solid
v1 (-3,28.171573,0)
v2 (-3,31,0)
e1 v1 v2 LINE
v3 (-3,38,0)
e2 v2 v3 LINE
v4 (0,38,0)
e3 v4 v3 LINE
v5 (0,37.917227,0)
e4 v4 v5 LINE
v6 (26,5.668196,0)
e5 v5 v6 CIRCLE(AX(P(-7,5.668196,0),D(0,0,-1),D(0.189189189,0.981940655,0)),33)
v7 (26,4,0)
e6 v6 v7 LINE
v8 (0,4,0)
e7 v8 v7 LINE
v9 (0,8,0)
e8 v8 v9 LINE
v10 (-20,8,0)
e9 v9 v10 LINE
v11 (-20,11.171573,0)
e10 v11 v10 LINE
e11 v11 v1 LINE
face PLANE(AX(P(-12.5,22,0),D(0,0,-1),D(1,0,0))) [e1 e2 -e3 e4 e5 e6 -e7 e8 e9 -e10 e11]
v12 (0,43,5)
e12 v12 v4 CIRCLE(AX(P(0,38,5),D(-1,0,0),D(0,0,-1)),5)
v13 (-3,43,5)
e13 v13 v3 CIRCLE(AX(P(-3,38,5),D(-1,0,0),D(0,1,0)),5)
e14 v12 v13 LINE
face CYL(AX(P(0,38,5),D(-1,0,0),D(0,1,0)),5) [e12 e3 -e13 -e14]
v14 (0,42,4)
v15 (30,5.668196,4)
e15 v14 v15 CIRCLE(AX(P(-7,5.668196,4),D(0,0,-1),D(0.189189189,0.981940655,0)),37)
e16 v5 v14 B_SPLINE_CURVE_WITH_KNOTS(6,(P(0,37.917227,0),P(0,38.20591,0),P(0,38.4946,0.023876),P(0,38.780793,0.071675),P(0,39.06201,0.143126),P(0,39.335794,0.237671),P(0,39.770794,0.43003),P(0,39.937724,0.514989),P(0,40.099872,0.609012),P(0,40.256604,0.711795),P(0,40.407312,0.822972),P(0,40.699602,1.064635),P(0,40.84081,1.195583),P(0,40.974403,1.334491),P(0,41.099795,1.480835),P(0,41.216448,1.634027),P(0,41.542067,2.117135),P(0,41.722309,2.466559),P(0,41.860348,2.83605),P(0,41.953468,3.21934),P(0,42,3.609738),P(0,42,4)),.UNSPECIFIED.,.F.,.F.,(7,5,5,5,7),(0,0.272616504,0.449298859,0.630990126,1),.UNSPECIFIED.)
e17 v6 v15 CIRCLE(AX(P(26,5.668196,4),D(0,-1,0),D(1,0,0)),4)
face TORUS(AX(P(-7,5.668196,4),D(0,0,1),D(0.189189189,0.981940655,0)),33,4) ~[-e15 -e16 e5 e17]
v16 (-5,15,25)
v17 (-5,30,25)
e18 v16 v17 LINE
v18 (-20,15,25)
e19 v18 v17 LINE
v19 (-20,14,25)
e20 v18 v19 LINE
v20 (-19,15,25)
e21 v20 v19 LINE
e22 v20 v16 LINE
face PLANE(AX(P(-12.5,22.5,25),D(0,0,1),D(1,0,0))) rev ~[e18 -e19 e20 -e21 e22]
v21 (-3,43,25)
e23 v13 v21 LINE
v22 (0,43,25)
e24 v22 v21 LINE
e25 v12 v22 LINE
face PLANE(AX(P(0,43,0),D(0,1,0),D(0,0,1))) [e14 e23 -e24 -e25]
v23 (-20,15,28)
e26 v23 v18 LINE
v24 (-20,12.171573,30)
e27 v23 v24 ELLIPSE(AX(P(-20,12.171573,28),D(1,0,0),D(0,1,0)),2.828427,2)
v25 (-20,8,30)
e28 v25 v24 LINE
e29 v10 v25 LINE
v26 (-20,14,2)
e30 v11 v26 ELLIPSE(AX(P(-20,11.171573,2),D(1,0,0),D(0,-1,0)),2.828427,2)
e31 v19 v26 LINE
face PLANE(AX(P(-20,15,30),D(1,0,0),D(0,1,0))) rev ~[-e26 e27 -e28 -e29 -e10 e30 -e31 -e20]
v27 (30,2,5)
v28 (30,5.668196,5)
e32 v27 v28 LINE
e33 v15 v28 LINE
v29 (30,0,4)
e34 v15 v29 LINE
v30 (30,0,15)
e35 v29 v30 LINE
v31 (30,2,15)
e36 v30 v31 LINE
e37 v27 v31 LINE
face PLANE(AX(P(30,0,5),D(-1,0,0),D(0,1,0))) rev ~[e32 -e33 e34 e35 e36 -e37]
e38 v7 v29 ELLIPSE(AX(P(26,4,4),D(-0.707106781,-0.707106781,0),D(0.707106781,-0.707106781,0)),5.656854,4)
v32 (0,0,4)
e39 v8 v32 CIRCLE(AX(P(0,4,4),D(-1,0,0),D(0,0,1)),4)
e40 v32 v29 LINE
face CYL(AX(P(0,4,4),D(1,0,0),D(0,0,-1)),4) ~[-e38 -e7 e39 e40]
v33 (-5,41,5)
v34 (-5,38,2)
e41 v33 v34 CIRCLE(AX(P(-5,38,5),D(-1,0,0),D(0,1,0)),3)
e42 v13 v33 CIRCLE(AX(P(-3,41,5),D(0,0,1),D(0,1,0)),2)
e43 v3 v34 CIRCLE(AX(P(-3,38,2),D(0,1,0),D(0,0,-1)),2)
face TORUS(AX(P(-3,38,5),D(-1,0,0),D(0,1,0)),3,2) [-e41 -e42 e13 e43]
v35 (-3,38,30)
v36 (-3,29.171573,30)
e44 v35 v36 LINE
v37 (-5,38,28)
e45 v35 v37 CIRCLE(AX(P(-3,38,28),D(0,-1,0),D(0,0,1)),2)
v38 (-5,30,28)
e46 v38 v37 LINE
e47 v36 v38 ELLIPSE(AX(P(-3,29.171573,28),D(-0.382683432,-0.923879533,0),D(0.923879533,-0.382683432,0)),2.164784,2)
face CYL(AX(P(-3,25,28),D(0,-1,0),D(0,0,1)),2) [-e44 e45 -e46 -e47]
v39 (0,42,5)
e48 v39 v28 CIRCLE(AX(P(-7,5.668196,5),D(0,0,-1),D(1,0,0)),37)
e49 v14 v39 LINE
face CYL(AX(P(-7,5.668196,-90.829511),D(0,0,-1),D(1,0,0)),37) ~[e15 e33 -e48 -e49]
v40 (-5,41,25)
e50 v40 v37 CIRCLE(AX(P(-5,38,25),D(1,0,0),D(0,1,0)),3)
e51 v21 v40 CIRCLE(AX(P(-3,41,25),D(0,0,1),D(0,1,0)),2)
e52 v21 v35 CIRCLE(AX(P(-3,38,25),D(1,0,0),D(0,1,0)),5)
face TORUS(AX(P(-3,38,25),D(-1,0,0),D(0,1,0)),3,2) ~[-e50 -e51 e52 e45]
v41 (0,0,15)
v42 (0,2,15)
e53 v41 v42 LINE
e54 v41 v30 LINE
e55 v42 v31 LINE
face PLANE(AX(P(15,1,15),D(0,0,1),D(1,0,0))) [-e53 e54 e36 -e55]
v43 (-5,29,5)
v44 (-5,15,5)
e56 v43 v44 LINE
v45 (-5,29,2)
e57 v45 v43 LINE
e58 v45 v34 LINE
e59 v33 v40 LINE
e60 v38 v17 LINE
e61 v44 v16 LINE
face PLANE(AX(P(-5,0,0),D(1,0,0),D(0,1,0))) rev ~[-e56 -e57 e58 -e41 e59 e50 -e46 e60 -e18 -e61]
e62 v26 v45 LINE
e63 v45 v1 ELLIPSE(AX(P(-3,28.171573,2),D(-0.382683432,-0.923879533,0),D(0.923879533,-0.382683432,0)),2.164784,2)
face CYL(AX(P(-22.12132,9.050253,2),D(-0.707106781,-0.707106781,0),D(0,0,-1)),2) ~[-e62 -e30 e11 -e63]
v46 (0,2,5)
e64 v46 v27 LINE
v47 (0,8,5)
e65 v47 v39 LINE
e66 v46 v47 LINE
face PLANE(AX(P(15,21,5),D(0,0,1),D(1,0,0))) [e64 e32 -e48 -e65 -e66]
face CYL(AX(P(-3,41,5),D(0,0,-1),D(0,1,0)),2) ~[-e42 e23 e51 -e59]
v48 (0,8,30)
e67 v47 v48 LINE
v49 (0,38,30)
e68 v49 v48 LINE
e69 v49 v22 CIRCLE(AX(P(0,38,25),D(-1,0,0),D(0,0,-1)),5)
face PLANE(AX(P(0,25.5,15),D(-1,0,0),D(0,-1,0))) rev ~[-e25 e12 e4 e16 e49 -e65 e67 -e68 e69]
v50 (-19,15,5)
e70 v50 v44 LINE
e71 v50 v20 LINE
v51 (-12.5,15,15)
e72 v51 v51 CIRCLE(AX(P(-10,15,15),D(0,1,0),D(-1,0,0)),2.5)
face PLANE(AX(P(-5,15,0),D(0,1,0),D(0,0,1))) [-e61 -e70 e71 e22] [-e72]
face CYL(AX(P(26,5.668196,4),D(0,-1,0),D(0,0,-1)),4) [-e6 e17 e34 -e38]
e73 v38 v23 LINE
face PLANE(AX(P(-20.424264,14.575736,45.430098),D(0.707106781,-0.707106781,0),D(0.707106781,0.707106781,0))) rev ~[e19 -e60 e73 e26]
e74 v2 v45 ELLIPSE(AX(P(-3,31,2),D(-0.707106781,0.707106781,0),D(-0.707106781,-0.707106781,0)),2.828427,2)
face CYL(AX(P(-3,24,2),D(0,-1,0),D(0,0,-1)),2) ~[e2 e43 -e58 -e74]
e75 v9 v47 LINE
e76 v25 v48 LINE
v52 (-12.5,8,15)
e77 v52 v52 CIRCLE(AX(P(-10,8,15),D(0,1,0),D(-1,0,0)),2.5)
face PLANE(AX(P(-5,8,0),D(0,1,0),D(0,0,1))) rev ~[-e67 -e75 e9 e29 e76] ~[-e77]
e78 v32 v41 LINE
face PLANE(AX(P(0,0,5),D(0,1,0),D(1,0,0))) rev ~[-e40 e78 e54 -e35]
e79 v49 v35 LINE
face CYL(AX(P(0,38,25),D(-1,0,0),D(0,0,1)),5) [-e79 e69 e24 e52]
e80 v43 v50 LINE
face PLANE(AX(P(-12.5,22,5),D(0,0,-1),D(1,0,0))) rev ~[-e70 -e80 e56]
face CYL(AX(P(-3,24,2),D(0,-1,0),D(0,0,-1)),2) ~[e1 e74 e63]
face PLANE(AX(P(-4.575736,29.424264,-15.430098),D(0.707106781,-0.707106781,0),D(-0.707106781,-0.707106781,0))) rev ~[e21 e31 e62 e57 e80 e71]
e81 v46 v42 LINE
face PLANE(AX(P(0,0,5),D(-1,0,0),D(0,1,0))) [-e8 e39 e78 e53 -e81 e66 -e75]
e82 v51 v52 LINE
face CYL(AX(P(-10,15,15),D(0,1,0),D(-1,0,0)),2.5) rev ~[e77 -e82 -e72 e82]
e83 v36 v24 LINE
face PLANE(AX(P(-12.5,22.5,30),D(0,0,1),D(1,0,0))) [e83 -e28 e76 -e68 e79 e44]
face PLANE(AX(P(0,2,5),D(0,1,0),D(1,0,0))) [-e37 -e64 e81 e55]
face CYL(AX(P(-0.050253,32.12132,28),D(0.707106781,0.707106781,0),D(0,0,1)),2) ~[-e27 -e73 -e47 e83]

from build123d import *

# Parameters (mm, degrees)
F0_W          = 30
F0_H          = 42
F1_DEPTH      = 5
F2_T1_DEPTH   = 186.6590212458
F3_W          = 30
F3_H          = 2
F4_DEPTH      = 10
F5_W          = 35
F5_H          = 30
F6_DEPTH      = 5
F7_W          = 7
F7_H          = 30
F8_DEPTH      = 15
F9_R          = 2.5
F10_DEPTH     = 10
F11_R         = 4
F12_W         = 15
F12_H         = 14
F13_DEPTH     = 5
F14_W         = 15
F14_H         = 15
F15_DEPTH     = 5
F16_T4_DEPTH  = 35.8601958556
F16_T9_DEPTH  = 35.8601958556
F17_R         = 5
F18_T1_DEPTH  = 20
F18_T6_DEPTH  = 9.5699020722
F18_T11_DEPTH = 31.2132034356
F18_T16_DEPTH = 31.2132034356
F18_T21_DEPTH = 14
F18_T24_ANGLE = 90
F18_T26_ANGLE = 90
F18_T30_DEPTH = 13
F18_T36_DEPTH = 14
F18_T40_DEPTH = 31.2132034356
F18_T47_DEPTH = 13
F18_T51_DEPTH = 31.2132034356


# Not quite as in the source:
# - a fillet or chamfer that OpenCascade refuses, or shapes differently, is made with other operations: its cross-section is extruded or revolved along the edge and cut away or added


with BuildPart() as f1:
    # F0 (on Top) → F1 (new body)
    with BuildSketch(Plane.XY):
        with Locations((15, 21)):
            Rectangle(F0_W, F0_H)
    extrude(amount=F1_DEPTH)

    # F2: fillet of radius 37 on 1 edges, made by hand

    # F2_s2 → F2_t1 (cut)
    with BuildSketch(Plane.XY.offset(-90.8295106229)):
        with BuildLine():
            ThreePointArc((30, 5.6681957508), (21.5306852354, 29.2266337296), (0, 42))
            Line((0, 42), (30, 42))
            Line((30, 42), (30, 5.6681957508))
        make_face()
    extrude(amount=F2_T1_DEPTH, mode=Mode.SUBTRACT)

    # F3 (on face) → F4 (join)
    with BuildSketch(Plane.XY.offset(5)):
        with Locations((15, 1)):
            Rectangle(F3_W, F3_H)
    extrude(amount=F4_DEPTH)

    # F5 (on face) → F6 (join)
    with BuildSketch(Plane(origin=(0, 0, 0), x_dir=(0, -1, 0), z_dir=(-1, 0, 0))):
        with Locations((-25.5, 15)):
            Rectangle(F5_W, F5_H)
    extrude(amount=F6_DEPTH)

    # F7 (on face) → F8 (join)
    with BuildSketch(Plane(origin=(-5, 0, 0), x_dir=(0, -1, 0), z_dir=(-1, 0, 0))):
        with Locations((-11.5, 15)):
            Rectangle(F7_W, F7_H)
    extrude(amount=F8_DEPTH)

    # F9 (on face) → F10 (cut)
    with BuildSketch(Plane(origin=(0, 15, 0), x_dir=(-1, 0, 0), z_dir=(0, 1, 0))):
        with Locations((10, 15)):
            Circle(F9_R)
    extrude(amount=-F10_DEPTH, mode=Mode.SUBTRACT)

    # F11
    f11_edges = [f1.edges().sort_by_distance(p)[0] for p in [
        (21.530685, 29.226634, 0),
        (15, 0, 0),
    ]]
    fillet(f11_edges, radius=F11_R)

    # F12 (on face) → F13 (join)
    with BuildSketch(Plane(origin=(0, 0, 0), x_dir=(1, 0, 0), z_dir=(0, 0, -1))):
        with Locations((-12.5, -22)):
            Rectangle(F12_W, F12_H)
    extrude(amount=-F13_DEPTH)

    # F14 (on face) → F15 (join)
    with BuildSketch(Plane.XY.offset(30)):
        with Locations((-12.5, 22.5)):
            Rectangle(F14_W, F14_H)
    extrude(amount=-F15_DEPTH)

    # F16: chamfer of 15 on 2 edges, made by hand


with BuildPart() as f16_tool2:
    # F16_s3 → F16_t4 (new body)
    with BuildSketch(Plane.XY.offset(45.4300979278)):
        with BuildLine():
            Line((-20.4242640687, 14.5757359313), (-4.5757359313, 30.4242640687))
            Line((-4.5757359313, 30.4242640687), (-4.5757359313, 30.7242640687))
            ThreePointArc((-4.5757359313, 30.7242640687), (-12.2878679656, 30.3), (-20, 30.3))
            Line((-20, 30.3), (-20.3, 30))
            ThreePointArc((-20.3, 30), (-20.3, 22.2878679656), (-20.7242640687, 14.5757359313))
            Line((-20.7242640687, 14.5757359313), (-20.4242640687, 14.5757359313))
        make_face()
    extrude(amount=-F16_T4_DEPTH)

    split(bisect_by=Plane.YZ.offset(-5), keep=Keep.BOTTOM)


with BuildPart() as f1_1:
    add(f1.part)

    # F16_t1: cut F16_tool2
    add(f16_tool2.part, mode=Mode.SUBTRACT)


with BuildPart() as f16_tool7:
    # F16_s8 → F16_t9 (new body)
    with BuildSketch(Plane.XY.offset(-15.4300979278)):
        with BuildLine():
            Line((-4.5757359313, 29.4242640687), (-20.4242640687, 13.5757359313))
            Line((-20.4242640687, 13.5757359313), (-20.7242640687, 13.5757359313))
            ThreePointArc((-20.7242640687, 13.5757359313), (-20.3, 21.2878679656), (-20.3, 29))
            Line((-20.3, 29), (-20, 29.3))
            ThreePointArc((-20, 29.3), (-12.2878679656, 29.3), (-4.5757359313, 29.7242640687))
            Line((-4.5757359313, 29.7242640687), (-4.5757359313, 29.4242640687))
        make_face()
    extrude(amount=F16_T9_DEPTH)

    split(bisect_by=Plane.YZ.offset(-5), keep=Keep.BOTTOM)


with BuildPart() as f1_2:
    add(f1_1.part)

    # F16_t6: cut F16_tool7
    add(f16_tool7.part, mode=Mode.SUBTRACT)

    # F17
    f17_edges = [f1_2.edges().sort_by_distance(p)[0] for p in [
        (-2.5, 43, 0),
        (-2.5, 43, 30),
    ]]
    fillet(f17_edges, radius=F17_R)

    # F18: fillet of radius 2 on 9 edges, made by hand

    # F18_s2 → F18_t1 (cut)
    with BuildSketch(Plane.XY.offset(5)):
        with BuildLine():
            ThreePointArc((-3, 43), (-4.4142135624, 42.4142135624), (-5, 41))
            Line((-5, 41), (-5, 43))
            Line((-5, 43), (-3, 43))
        make_face()
    extrude(amount=F18_T1_DEPTH, mode=Mode.SUBTRACT)


with BuildPart() as f18_tool4:
    # F18_s5 → F18_t6 (new body)
    with BuildSketch(Plane.XY.offset(25)):
        with BuildLine():
            ThreePointArc((-20, 13), (-19.4142135624, 14.4142135624), (-18, 15))
            Line((-18, 15), (-20, 15))
            Line((-20, 15), (-20, 13))
        make_face()
    extrude(amount=-F18_T6_DEPTH)

    split(bisect_by=Plane(origin=(-17, 17, 0), x_dir=(0, 0, 1), z_dir=(-0.7071067812, 0.7071067812, 0)), keep=Keep.TOP)


with BuildPart() as f1_3:
    add(f1_2.part)

    # F18_t3: cut F18_tool4
    add(f18_tool4.part, mode=Mode.SUBTRACT)


with BuildPart() as f18_tool9:
    # F18_s10 → F18_t11 (new body)
    with BuildSketch(Plane(origin=(-6.5355339059, -6.5355339059, 0), x_dir=(0, 0, 1), z_dir=(0.7071067812, 0.7071067812, 0))):
        with BuildLine():
            ThreePointArc((0, -22.0416305603), (0.5857864376, -23.4558441227), (2, -24.0416305603))
            Line((2, -24.0416305603), (0, -24.0416305603))
            Line((0, -24.0416305603), (0, -22.0416305603))
        make_face()
    extrude(amount=F18_T11_DEPTH)

    split(bisect_by=Plane.YZ.offset(-5), keep=Keep.BOTTOM)


with BuildPart() as f1_4:
    add(f1_3.part)

    # F18_t8: cut F18_tool9
    add(f18_tool9.part, mode=Mode.SUBTRACT)


with BuildPart() as f18_tool14:
    # F18_s15 → F18_t16 (new body)
    with BuildSketch(Plane(origin=(16.0355339059, 16.0355339059, 0), x_dir=(0, 0, 1), z_dir=(-0.7071067812, -0.7071067812, 0))):
        with BuildLine():
            ThreePointArc((30, 22.7487373415), (29.4142135624, 24.1629509039), (28, 24.7487373415))
            Line((28, 24.7487373415), (30, 24.7487373415))
            Line((30, 24.7487373415), (30, 22.7487373415))
        make_face()
    extrude(amount=F18_T16_DEPTH)

    split(bisect_by=Plane.YZ.offset(-5), keep=Keep.BOTTOM)


with BuildPart() as f1_5:
    add(f1_4.part)

    # F18_t13: cut F18_tool14
    add(f18_tool14.part, mode=Mode.SUBTRACT)


with BuildPart() as f18_tool19:
    # F18_s20 → F18_t21 (new body)
    with BuildSketch(Plane.XZ.offset(-24)):
        with BuildLine():
            ThreePointArc((-3, 0), (-4.4142135624, 0.5857864376), (-5, 2))
            Line((-5, 2), (-5, 0))
            Line((-5, 0), (-3, 0))
        make_face()
    extrude(amount=-F18_T21_DEPTH)

    split(bisect_by=Plane(origin=(-17, 17, 0), x_dir=(0, 0, 1), z_dir=(-0.7071067812, 0.7071067812, 0)), keep=Keep.TOP)


with BuildPart() as f1_6:
    add(f1_5.part)

    # F18_t18: cut F18_tool19
    add(f18_tool19.part, mode=Mode.SUBTRACT)

    # F18_s23 → F18_t24 (revolve, cut)
    with BuildSketch(Plane.XY.offset(5)):
        with BuildLine():
            ThreePointArc((-3, 43), (-4.4142135624, 42.4142135624), (-5, 41))
            Line((-5, 41), (-5, 43))
            Line((-5, 43), (-3, 43))
        make_face()
    revolve(axis=Axis((-5, 38, 5), (-1, 0, 0)), revolution_arc=F18_T24_ANGLE, mode=Mode.SUBTRACT)

    # F18_s25 → F18_t26 (revolve, cut)
    with BuildSketch(Plane.XY.offset(25)):
        with BuildLine():
            ThreePointArc((-3, 43), (-4.4142135624, 42.4142135624), (-5, 41))
            Line((-5, 41), (-5, 43))
            Line((-5, 43), (-3, 43))
        make_face()
    revolve(axis=Axis((-5, 38, 25), (1, 0, 0)), revolution_arc=F18_T26_ANGLE, mode=Mode.SUBTRACT)


with BuildPart() as f18_tool28:
    # F18_s29 → F18_t30 (new body)
    with BuildSketch(Plane.XZ.offset(-25)):
        with BuildLine():
            ThreePointArc((-3, 30), (-4.4142135624, 29.4142135624), (-5, 28))
            Line((-5, 28), (-5, 30))
            Line((-5, 30), (-3, 30))
        make_face()
    extrude(amount=-F18_T30_DEPTH)

    split(bisect_by=Plane(origin=(-17.5, 17.5, 0), x_dir=(0, 0, 1), z_dir=(-0.7071067812, 0.7071067812, 0)), keep=Keep.TOP)


with BuildPart() as f1_7:
    add(f1_6.part)

    # F18_t27: cut F18_tool28
    add(f18_tool28.part, mode=Mode.SUBTRACT)


with BuildPart() as f18_tool34:
    # F18_s35 → F18_t36 (new body)
    with BuildSketch(Plane.XZ.offset(-24)):
        with BuildLine():
            ThreePointArc((-3, 0), (-4.4142135624, 0.5857864376), (-5, 2))
            Line((-5, 2), (-5, 0))
            Line((-5, 0), (-3, 0))
        make_face()
    extrude(amount=-F18_T36_DEPTH)

    split(bisect_by=Plane(origin=(-17, 17, 0), x_dir=(0, 0, 1), z_dir=(0.7071067812, -0.7071067812, 0)), keep=Keep.TOP)


with BuildPart() as f18_tool38:
    # F18_s39 → F18_t40 (new body)
    with BuildSketch(Plane(origin=(-6.5355339059, -6.5355339059, 0), x_dir=(0, 0, 1), z_dir=(0.7071067812, 0.7071067812, 0))):
        with BuildLine():
            ThreePointArc((0, -22.0416305603), (0.5857864376, -23.4558441227), (2, -24.0416305603))
            Line((2, -24.0416305603), (0, -24.0416305603))
            Line((0, -24.0416305603), (0, -22.0416305603))
        make_face()
    extrude(amount=F18_T40_DEPTH)

    split(bisect_by=Plane.YZ.offset(-5), keep=Keep.TOP)


with BuildPart() as f18_tool34_1:
    add(f18_tool34.part)

    # F18_t42: intersect F18_tool38
    add(f18_tool38.part, mode=Mode.INTERSECT)


with BuildPart() as f1_8:
    add(f1_7.part)

    # F18_t32: cut F18_tool34
    add(f18_tool34_1.part, mode=Mode.SUBTRACT)


with BuildPart() as f18_tool45:
    # F18_s46 → F18_t47 (new body)
    with BuildSketch(Plane.XZ.offset(-25)):
        with BuildLine():
            ThreePointArc((-3, 30), (-4.4142135624, 29.4142135624), (-5, 28))
            Line((-5, 28), (-5, 30))
            Line((-5, 30), (-3, 30))
        make_face()
    extrude(amount=-F18_T47_DEPTH)

    split(bisect_by=Plane(origin=(-17.5, 17.5, 0), x_dir=(0, 0, 1), z_dir=(0.7071067812, -0.7071067812, 0)), keep=Keep.TOP)


with BuildPart() as f18_tool49:
    # F18_s50 → F18_t51 (new body)
    with BuildSketch(Plane(origin=(16.0355339059, 16.0355339059, 0), x_dir=(0, 0, 1), z_dir=(-0.7071067812, -0.7071067812, 0))):
        with BuildLine():
            ThreePointArc((30, 22.7487373415), (29.4142135624, 24.1629509039), (28, 24.7487373415))
            Line((28, 24.7487373415), (30, 24.7487373415))
            Line((30, 24.7487373415), (30, 22.7487373415))
        make_face()
    extrude(amount=F18_T51_DEPTH)

    split(bisect_by=Plane.YZ.offset(-5), keep=Keep.TOP)


with BuildPart() as f18_tool45_1:
    add(f18_tool45.part)

    # F18_t53: intersect F18_tool49
    add(f18_tool49.part, mode=Mode.INTERSECT)


with BuildPart() as f1_9:
    add(f1_8.part)

    # F18_t43: cut F18_tool45
    add(f18_tool45_1.part, mode=Mode.SUBTRACT)


solid = f1_9.part
